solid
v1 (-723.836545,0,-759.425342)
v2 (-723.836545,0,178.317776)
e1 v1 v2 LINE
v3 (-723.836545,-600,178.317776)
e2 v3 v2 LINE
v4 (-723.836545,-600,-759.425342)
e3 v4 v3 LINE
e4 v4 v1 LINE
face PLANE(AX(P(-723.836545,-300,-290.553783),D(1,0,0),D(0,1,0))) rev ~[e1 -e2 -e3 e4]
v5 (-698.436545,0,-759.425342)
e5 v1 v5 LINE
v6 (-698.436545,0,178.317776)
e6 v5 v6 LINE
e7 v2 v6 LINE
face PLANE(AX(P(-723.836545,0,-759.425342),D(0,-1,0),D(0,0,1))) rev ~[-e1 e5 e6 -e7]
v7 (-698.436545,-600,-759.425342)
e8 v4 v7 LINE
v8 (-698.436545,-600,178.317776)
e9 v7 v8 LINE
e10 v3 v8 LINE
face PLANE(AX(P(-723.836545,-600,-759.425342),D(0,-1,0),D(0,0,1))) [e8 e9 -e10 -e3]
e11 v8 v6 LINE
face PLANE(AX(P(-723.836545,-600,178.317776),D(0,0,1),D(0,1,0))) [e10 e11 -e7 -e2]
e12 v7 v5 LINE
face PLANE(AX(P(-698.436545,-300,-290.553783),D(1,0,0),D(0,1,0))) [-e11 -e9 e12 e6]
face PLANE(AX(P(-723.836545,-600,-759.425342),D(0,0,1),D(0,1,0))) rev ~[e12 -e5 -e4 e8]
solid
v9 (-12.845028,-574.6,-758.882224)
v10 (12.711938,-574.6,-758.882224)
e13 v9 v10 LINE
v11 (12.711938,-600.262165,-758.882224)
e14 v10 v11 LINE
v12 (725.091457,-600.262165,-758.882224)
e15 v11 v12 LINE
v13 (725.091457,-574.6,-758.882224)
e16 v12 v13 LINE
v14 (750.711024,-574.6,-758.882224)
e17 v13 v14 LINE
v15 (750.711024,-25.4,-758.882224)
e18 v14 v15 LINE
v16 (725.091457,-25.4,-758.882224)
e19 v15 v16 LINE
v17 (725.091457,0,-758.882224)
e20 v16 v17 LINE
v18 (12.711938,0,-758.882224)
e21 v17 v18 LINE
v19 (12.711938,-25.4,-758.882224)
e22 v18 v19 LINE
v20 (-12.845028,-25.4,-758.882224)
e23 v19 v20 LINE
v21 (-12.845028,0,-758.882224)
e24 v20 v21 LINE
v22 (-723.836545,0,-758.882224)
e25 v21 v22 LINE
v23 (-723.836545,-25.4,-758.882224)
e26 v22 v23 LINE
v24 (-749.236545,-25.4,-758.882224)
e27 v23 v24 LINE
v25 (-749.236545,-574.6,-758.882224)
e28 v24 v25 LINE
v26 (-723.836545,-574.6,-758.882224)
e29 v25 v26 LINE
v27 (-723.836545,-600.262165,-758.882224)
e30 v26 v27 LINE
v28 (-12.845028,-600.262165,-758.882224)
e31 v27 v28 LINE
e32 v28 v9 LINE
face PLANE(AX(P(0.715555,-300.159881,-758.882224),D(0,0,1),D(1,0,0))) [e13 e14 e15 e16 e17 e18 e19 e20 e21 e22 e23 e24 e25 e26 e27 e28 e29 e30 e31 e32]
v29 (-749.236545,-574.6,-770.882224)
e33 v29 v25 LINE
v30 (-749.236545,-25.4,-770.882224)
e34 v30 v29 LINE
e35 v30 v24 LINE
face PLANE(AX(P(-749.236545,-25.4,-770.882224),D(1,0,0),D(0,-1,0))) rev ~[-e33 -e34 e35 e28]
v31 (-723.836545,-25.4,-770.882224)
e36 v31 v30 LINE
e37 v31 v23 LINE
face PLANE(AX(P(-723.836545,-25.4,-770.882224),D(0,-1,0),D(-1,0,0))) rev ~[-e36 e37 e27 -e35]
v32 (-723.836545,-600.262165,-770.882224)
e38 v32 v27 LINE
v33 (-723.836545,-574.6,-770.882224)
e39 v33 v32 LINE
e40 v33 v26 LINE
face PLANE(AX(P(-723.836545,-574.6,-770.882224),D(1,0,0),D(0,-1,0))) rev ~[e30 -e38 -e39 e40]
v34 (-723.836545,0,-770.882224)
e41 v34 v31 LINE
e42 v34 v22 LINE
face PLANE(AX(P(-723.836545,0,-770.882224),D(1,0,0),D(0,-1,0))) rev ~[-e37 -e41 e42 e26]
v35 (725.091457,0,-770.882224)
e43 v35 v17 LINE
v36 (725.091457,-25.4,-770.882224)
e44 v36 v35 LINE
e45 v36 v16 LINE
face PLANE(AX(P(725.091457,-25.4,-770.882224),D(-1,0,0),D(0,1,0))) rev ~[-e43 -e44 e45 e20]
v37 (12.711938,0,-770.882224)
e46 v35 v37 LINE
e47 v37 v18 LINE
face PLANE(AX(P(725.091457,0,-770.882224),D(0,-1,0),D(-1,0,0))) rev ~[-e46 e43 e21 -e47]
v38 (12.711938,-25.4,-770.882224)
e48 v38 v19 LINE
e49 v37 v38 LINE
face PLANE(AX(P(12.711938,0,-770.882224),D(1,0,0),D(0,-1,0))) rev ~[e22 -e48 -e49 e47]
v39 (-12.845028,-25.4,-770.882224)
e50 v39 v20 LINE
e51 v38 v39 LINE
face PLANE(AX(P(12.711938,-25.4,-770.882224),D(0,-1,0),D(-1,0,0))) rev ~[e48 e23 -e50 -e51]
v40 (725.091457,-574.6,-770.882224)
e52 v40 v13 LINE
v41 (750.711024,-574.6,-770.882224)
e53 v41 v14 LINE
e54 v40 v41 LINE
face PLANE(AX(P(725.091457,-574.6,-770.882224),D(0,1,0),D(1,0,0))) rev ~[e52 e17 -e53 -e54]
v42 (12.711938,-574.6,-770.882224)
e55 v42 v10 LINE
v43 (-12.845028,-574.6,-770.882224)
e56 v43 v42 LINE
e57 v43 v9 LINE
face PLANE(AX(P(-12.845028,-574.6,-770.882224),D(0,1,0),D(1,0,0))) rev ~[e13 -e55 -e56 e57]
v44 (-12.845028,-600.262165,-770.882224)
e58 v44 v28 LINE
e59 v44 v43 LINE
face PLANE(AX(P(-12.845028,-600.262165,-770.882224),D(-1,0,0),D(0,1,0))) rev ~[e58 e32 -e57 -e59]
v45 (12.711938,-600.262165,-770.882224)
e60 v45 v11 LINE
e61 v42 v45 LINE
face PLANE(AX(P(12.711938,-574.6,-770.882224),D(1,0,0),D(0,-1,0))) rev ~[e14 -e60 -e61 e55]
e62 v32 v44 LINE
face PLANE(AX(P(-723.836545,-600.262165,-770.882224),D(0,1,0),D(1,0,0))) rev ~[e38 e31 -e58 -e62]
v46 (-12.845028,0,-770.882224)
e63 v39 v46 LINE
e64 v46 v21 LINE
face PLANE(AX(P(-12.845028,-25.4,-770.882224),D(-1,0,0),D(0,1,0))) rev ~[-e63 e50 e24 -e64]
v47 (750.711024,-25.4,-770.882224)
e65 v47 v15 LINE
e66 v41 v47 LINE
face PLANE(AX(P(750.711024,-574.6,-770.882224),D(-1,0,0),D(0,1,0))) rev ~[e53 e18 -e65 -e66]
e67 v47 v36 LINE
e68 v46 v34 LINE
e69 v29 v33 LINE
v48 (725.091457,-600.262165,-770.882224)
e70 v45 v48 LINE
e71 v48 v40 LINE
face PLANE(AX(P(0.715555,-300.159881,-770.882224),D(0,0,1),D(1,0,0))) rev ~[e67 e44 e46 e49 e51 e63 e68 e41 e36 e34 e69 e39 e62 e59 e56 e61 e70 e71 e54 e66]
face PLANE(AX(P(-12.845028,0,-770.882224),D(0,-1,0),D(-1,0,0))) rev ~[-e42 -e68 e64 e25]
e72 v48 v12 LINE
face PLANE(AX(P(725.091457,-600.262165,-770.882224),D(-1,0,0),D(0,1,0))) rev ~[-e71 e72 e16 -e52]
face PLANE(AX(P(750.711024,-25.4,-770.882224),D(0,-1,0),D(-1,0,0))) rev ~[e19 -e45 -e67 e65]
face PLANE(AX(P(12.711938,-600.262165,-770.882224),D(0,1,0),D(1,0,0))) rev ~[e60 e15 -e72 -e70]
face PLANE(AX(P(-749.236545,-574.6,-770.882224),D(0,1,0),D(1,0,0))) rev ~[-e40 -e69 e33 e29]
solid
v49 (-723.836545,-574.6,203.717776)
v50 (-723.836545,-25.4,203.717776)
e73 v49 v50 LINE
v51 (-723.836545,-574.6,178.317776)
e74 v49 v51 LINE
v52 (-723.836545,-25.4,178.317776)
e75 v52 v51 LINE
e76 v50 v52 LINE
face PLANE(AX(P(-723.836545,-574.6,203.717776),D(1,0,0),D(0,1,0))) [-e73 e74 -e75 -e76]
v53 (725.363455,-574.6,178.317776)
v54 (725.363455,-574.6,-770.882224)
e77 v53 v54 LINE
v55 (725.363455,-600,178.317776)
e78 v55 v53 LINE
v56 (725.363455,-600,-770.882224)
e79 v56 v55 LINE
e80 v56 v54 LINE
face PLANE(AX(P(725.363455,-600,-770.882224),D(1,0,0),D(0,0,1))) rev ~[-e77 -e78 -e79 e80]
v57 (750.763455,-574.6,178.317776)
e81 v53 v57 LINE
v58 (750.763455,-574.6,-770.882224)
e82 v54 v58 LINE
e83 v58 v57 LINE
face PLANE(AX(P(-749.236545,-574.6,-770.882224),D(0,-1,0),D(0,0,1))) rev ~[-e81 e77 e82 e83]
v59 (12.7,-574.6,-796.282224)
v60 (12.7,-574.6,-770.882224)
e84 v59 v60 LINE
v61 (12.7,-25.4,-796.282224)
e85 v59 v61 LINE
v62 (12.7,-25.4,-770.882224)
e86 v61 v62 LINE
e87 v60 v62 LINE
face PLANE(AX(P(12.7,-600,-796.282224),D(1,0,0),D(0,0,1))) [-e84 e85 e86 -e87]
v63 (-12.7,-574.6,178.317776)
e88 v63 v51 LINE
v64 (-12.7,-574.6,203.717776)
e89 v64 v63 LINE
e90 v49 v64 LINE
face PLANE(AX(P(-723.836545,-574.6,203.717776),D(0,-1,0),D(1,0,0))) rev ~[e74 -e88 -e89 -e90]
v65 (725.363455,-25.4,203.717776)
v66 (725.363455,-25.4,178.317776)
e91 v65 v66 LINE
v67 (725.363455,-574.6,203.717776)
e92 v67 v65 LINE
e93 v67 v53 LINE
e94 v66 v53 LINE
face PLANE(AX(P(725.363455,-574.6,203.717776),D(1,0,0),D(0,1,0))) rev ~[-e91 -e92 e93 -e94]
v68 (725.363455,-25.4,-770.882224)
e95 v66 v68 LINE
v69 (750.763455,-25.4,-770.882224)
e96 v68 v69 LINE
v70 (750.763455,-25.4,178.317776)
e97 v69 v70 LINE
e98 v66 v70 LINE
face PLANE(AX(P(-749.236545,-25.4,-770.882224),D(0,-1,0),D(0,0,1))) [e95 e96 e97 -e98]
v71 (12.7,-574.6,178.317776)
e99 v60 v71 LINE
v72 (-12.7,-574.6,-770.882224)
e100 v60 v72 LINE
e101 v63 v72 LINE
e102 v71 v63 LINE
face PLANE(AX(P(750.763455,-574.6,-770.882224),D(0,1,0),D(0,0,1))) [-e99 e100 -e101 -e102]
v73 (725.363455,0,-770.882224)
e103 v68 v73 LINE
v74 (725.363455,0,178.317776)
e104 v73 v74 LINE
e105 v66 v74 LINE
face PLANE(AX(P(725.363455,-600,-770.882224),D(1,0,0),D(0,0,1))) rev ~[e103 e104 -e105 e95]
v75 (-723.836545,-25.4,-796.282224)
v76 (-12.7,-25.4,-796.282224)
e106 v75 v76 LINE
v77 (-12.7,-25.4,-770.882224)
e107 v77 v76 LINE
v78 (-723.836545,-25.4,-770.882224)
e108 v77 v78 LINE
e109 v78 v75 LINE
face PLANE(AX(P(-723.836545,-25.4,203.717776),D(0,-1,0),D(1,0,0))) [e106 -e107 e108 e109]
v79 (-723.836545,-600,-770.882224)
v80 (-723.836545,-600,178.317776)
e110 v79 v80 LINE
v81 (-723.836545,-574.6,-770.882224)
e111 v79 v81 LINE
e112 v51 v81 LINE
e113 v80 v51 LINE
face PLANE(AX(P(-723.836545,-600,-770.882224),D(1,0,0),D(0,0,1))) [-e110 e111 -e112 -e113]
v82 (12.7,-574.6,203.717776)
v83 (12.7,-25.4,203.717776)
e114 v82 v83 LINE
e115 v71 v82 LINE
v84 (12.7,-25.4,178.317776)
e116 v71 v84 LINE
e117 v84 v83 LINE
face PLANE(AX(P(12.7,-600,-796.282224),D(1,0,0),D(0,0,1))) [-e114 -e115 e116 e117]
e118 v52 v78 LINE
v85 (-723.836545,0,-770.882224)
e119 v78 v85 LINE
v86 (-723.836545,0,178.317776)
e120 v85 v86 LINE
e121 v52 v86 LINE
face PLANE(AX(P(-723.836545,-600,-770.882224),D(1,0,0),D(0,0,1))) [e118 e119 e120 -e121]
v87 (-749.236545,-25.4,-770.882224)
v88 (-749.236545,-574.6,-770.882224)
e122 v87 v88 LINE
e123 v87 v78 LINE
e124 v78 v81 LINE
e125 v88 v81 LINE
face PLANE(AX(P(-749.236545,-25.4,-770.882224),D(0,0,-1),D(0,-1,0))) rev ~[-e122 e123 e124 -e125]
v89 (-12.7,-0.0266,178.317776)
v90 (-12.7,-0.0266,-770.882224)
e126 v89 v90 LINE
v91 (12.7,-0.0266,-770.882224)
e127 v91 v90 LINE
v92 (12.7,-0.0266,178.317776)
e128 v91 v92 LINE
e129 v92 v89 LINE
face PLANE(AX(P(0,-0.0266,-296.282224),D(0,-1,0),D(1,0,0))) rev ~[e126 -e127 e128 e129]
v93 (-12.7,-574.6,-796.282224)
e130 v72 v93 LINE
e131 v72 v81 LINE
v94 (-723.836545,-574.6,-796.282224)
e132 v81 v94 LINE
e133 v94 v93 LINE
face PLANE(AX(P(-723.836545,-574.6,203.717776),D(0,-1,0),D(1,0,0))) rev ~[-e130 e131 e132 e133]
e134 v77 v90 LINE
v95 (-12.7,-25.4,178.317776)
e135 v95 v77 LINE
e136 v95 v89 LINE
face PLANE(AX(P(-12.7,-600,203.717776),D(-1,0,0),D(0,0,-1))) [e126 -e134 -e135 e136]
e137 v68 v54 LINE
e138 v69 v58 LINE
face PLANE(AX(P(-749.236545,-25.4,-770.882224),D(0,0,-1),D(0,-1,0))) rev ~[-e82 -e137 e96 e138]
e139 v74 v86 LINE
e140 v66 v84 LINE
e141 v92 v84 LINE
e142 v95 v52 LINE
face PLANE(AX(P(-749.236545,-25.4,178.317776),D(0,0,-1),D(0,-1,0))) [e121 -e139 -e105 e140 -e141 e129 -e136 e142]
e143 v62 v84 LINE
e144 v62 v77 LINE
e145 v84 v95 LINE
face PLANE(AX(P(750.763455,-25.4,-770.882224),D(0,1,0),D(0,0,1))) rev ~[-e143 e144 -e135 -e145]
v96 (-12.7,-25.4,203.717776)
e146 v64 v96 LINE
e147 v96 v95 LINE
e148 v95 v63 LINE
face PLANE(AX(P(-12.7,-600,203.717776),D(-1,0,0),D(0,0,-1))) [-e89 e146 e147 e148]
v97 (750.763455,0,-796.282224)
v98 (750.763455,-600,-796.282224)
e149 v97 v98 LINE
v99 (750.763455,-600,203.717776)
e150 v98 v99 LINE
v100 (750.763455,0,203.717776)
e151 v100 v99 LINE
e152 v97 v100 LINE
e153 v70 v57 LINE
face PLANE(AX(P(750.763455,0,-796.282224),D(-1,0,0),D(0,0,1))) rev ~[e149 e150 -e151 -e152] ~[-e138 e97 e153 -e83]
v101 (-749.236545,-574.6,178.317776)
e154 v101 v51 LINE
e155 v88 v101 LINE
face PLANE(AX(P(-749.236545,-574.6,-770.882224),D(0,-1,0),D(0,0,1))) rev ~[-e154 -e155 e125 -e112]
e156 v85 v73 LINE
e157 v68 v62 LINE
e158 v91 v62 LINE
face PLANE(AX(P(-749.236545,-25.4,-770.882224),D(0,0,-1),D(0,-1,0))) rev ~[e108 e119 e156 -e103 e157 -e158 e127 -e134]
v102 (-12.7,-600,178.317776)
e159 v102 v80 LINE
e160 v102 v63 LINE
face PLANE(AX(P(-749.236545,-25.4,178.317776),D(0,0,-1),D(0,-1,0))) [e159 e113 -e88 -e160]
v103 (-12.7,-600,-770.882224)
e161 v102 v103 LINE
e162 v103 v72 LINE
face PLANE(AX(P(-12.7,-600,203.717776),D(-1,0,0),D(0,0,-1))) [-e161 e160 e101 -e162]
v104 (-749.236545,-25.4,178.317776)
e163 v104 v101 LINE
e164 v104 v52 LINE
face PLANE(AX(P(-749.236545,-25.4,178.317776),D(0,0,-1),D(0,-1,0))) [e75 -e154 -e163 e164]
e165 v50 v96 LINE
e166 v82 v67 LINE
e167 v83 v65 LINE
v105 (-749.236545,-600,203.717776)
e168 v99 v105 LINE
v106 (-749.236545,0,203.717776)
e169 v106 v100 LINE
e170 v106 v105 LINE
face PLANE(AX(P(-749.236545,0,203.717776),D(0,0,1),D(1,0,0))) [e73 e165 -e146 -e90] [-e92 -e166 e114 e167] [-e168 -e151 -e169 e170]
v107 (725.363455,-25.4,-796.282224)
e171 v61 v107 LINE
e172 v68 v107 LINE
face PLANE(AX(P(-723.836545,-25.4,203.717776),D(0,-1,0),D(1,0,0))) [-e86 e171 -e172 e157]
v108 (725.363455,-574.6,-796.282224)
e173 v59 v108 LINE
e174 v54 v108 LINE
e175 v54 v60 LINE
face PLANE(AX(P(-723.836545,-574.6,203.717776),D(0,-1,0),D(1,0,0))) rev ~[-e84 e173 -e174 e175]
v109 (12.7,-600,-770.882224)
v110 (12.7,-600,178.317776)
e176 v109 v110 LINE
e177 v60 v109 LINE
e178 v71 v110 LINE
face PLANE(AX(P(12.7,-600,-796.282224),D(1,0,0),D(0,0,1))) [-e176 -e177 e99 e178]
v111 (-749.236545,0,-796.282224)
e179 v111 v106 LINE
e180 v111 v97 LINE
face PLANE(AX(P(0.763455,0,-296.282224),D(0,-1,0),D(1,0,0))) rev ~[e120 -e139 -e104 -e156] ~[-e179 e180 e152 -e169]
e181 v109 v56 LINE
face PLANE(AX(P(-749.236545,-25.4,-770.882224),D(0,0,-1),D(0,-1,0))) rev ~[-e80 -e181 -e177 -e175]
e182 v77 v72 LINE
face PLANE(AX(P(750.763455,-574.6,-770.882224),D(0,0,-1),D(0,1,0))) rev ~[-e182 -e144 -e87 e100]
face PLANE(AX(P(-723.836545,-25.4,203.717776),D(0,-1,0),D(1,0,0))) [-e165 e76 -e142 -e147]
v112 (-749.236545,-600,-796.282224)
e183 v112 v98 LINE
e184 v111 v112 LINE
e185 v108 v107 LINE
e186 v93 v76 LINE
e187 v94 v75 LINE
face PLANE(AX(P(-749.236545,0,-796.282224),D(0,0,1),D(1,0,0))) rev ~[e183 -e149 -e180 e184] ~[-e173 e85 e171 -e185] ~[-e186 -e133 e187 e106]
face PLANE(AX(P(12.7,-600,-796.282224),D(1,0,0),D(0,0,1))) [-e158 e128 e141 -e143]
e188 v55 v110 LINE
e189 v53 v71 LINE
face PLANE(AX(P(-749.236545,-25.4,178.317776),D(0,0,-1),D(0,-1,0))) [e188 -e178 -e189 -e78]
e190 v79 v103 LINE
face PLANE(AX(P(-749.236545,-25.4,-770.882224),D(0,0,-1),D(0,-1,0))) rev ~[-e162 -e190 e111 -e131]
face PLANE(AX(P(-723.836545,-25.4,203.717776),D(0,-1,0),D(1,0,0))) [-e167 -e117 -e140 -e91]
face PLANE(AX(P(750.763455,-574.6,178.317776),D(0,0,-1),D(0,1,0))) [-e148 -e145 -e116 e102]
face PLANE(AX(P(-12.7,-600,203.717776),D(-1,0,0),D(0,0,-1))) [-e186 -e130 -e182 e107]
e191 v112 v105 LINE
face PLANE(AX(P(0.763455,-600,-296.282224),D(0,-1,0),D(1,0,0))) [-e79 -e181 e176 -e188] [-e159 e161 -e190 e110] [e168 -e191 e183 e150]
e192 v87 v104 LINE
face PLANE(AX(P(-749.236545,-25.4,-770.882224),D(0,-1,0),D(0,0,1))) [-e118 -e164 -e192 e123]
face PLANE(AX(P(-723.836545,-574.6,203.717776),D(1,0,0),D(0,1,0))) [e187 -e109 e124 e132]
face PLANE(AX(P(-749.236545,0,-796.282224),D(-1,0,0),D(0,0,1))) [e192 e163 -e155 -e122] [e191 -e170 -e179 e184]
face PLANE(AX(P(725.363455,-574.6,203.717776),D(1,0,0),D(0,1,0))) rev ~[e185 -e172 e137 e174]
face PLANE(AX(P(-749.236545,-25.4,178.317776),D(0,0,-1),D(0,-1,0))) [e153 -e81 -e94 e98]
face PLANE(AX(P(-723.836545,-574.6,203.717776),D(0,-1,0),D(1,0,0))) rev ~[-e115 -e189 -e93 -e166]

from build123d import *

# Parameters (mm, degrees)
F0_W      = 1500
F0_H      = 1000
F1_DEPTH  = 600
F2_W      = 711.9
F2_H      = 949.2
F2_W_2    = 25.4
F3_DEPTH  = 600.001
F4_W      = 549.2
F4_H      = 949.2
F5_DEPTH  = 1500.001
F6_W      = 1449.2
F6_H      = 549.2
F7_DEPTH  = 1000.001
F9_DEPTH  = 599.9734
F10_W     = 549.2
F10_H     = 949.2
F11_DEPTH = 1500.001
F13_DEPTH = 12
F14_W     = 600
F14_H     = 937.7431182263
F15_DEPTH = 25.4


with BuildPart() as f1:
    # F0 (on Front) → F1 (new body)
    with BuildSketch(Plane.XZ):
        with Locations((0.7634554058, -296.2822238567)):
            Rectangle(F0_W, F0_H)
    extrude(amount=F1_DEPTH)

    # F2 (on face) → F3 (cut, through all)
    with BuildSketch(Plane.XZ.offset(600)):
        with Locations((-367.8865445942, -296.2822238567)):
            Rectangle(F2_W, F2_H)
        with Locations((0.7634554058, -296.2822238567)):
            Rectangle(F2_W_2, F2_H)
        with Locations((369.4134554058, -296.2822238567)):
            Rectangle(F2_W, F2_H)
    extrude(amount=-F3_DEPTH, mode=Mode.SUBTRACT)

    # F4 (on face) → F5 (cut, through all)
    with BuildSketch(Plane(origin=(-749.2365445942, 0, 0), x_dir=(0, -1, 0), z_dir=(-1, 0, 0))):
        with Locations((300, -296.2822238567)):
            Rectangle(F4_W, F4_H)
    extrude(amount=-F5_DEPTH, mode=Mode.SUBTRACT)

    # F6 (on face) → F7 (cut, through all)
    with BuildSketch(Plane.XY.offset(203.7177761433)):
        with Locations((0.7634554058, -300)):
            Rectangle(F6_W, F6_H)
    extrude(amount=-F7_DEPTH, mode=Mode.SUBTRACT)

    # F8 (on face) → F9 (join)
    with BuildSketch(Plane.XZ.offset(600)):
        Polygon((12.7, 203.7177761433), (0, 203.7177761433), (-12.7, 203.7177761433), (-12.7, -796.2822238567), (12.7, -796.2822238567), align=None)
    extrude(amount=-F9_DEPTH)

    # F10 (on face) → F11 (cut, through all)
    with BuildSketch(Plane.YZ.offset(750.7634554058)):
        with Locations((-300, -296.2822238567)):
            Rectangle(F10_W, F10_H)
    extrude(amount=-F11_DEPTH, mode=Mode.SUBTRACT)


with BuildPart() as f13:
    # F12 (on face) → F13 (new body)
    with BuildSketch(Plane.XY.offset(-770.8822238567)):
        Polygon((-749.2365445942, -25.4), (-749.2365445942, -574.6), (-723.8365445942, -574.6), (-723.8365445942, -600.2621650696), (-12.8450281918, -600.2621650696), (-12.8450281918, -574.6), (12.7119384706, -574.6), (12.7119384706, -600.2621650696), (725.0914573669, -600.2621650696), (725.0914573669, -574.6), (750.7110238075, -574.6), (750.7110238075, -25.4), (725.0914573669, -25.4), (725.0914573669, 0), (12.7119384706, 0), (12.7119384706, -25.4), (-12.8450281918, -25.4), (-12.8450281918, 0), (-723.8365445942, 0), (-723.8365445942, -25.4), align=None)
    extrude(amount=F13_DEPTH)


with BuildPart() as f15:
    # F14 (on face) → F15 (new body)
    with BuildSketch(Plane.YZ.offset(-723.8365445942)):
        with Locations((-300, -290.5537829698)):
            Rectangle(F14_W, F14_H)
    extrude(amount=F15_DEPTH)


solid = Compound([f1.part, f13.part, f15.part])
